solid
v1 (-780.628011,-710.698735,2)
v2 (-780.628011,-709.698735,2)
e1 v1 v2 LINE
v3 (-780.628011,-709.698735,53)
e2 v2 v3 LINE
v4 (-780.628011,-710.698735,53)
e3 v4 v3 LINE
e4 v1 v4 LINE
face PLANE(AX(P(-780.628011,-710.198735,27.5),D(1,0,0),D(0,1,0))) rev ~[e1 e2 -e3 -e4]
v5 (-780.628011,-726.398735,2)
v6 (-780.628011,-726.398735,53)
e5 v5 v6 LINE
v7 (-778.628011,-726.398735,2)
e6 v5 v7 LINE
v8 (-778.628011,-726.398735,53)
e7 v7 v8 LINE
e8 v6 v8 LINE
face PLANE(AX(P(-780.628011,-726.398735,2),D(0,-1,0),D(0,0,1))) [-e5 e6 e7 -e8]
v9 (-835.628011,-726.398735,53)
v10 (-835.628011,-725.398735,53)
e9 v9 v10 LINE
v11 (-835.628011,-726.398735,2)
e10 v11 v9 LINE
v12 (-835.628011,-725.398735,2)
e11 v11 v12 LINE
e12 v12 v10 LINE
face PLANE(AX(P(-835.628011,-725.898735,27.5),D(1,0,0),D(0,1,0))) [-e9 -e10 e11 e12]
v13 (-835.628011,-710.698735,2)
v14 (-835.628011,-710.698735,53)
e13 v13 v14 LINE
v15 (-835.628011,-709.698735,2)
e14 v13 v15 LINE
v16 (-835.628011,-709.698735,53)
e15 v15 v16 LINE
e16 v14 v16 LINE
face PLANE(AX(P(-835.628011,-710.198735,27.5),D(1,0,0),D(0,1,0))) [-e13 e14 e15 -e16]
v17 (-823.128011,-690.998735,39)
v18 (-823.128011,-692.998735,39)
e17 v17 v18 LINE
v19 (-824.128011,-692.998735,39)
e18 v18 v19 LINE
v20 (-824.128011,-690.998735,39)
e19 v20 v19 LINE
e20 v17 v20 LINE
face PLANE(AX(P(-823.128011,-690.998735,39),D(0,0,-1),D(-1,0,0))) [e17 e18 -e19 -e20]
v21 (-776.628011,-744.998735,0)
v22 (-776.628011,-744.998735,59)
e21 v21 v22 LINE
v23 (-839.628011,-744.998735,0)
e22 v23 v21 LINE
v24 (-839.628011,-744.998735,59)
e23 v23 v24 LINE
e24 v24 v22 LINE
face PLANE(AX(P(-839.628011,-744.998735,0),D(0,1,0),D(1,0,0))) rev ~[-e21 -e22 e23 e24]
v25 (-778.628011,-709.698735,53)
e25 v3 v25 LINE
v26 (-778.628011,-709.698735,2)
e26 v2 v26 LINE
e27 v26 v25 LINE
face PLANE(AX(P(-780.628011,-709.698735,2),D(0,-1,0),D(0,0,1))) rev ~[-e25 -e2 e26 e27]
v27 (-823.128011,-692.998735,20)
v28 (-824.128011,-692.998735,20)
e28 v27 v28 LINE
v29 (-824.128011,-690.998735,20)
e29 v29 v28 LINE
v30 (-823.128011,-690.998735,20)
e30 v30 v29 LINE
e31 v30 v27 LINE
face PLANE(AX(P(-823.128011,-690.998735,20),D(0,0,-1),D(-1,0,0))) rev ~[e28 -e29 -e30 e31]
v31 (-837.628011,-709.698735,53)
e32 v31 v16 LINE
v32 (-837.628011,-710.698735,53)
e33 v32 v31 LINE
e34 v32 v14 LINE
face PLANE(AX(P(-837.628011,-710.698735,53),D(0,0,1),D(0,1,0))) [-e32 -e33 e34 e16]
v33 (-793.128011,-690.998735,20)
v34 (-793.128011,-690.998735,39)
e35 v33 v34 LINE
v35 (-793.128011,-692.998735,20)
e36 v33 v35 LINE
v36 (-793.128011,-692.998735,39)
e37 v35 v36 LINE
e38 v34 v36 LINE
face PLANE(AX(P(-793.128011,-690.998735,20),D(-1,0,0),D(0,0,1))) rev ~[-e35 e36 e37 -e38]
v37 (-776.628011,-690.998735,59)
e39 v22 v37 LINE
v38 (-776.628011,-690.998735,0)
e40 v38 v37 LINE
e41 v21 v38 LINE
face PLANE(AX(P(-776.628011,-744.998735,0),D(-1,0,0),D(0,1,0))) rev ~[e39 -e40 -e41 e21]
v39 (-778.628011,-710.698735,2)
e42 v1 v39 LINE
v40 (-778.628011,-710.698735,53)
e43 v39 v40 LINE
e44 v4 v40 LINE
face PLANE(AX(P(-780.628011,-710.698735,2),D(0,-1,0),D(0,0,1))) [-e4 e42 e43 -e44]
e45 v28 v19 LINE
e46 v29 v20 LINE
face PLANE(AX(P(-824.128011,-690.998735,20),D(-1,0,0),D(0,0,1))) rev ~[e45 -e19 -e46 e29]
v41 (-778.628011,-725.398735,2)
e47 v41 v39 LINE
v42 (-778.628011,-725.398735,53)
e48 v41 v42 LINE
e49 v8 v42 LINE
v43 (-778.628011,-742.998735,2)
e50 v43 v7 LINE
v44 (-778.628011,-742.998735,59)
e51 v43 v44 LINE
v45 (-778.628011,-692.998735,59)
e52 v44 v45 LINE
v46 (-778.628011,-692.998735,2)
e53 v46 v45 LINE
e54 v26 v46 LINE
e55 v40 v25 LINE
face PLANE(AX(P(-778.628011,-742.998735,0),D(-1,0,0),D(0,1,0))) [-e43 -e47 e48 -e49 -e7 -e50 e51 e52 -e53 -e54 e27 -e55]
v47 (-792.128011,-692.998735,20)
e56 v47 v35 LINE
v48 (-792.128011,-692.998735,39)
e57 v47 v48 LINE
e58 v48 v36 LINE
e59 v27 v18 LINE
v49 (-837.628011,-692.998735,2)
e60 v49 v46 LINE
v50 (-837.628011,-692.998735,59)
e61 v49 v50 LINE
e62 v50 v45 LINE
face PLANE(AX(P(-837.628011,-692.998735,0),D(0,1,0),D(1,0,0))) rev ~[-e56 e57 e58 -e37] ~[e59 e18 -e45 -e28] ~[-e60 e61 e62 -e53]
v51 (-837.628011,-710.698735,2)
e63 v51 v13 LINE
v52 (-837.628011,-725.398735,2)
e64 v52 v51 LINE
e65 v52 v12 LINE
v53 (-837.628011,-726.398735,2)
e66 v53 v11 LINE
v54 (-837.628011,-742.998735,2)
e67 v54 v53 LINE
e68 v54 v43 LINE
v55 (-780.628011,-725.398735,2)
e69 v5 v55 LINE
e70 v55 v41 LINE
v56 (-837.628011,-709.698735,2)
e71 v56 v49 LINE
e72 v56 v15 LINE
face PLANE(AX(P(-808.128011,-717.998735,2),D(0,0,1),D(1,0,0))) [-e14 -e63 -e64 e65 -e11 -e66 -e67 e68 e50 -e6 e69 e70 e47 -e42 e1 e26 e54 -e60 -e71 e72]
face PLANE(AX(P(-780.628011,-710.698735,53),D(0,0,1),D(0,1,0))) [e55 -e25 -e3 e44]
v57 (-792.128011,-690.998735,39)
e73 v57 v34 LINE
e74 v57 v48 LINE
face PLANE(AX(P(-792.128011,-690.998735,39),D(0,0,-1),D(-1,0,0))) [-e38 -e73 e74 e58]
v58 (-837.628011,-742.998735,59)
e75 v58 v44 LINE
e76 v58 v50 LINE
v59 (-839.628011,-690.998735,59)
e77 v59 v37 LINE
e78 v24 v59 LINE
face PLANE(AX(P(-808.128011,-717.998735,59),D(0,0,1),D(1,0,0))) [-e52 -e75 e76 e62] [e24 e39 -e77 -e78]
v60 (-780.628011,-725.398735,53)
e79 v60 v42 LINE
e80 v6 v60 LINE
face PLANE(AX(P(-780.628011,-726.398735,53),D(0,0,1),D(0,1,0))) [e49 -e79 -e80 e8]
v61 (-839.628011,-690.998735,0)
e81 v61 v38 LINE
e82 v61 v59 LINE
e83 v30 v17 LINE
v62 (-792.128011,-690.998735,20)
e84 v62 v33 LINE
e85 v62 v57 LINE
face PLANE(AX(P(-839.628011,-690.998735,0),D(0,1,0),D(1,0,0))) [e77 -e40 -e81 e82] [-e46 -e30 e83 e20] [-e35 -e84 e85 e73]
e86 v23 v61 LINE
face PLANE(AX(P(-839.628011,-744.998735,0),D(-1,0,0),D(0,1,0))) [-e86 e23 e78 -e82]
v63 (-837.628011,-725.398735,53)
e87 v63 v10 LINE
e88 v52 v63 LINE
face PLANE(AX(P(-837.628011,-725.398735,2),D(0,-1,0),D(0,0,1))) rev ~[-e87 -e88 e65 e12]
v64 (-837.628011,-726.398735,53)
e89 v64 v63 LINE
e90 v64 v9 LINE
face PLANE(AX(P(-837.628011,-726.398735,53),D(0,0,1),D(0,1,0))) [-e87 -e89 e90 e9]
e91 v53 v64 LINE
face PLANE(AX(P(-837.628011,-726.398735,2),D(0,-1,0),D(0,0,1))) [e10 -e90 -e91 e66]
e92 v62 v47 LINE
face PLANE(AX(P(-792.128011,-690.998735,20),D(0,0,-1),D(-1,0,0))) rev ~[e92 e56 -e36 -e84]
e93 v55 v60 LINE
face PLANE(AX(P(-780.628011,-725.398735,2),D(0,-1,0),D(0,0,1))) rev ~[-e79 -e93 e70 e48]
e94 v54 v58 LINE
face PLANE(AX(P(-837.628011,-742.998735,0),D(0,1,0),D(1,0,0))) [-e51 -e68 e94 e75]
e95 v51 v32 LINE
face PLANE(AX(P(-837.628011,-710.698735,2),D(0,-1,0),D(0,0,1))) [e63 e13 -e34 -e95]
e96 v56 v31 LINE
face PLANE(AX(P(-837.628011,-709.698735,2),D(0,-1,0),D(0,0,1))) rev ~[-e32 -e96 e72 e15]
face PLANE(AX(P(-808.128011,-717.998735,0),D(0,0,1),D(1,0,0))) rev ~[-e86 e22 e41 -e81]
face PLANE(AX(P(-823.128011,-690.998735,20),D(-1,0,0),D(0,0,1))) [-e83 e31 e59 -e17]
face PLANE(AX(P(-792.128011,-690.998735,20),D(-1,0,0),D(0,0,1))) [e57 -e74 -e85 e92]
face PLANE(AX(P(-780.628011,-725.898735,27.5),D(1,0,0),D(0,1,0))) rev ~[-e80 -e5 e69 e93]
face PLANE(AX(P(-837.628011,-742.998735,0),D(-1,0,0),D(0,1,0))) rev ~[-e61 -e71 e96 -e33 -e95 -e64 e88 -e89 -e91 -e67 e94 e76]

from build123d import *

# Parameters (mm, degrees)
F0_W     = 63
F0_H     = 54
F0_W_2   = 59
F0_H_2   = 50
F1_DEPTH = 59
F2_DEPTH = 2
F3_W     = 1
F3_H     = 51
F4_DEPTH = 2
F5_START = 57
F5_DEPTH = 2
F6_W     = 1
F6_H     = 19
F7_DEPTH = 3


with BuildPart() as f1:
    # F0 (on Top) → F1 (new body)
    with BuildSketch(Plane.XY):
        with Locations((-808.1280109427, -717.9987351179)):
            Rectangle(F0_W, F0_H)
        with Locations((-808.1280109427, -717.9987351179)):
            Rectangle(F0_W_2, F0_H_2, mode=Mode.SUBTRACT)
    extrude(amount=F1_DEPTH)

    # F0 (on Top) → F2 (join)
    with BuildSketch(Plane.XY):
        with Locations((-808.1280109427, -717.9987351179)):
            Rectangle(F0_W_2, F0_H_2)
    extrude(amount=F2_DEPTH)

    # F3 (on face) → F4 (join)
    with BuildSketch(Plane.YZ.offset(-837.6280109427)):
        with Locations((-710.1987351179, 27.5)):
            Rectangle(F3_W, F3_H)
        with Locations((-725.8987351179, 27.5)):
            Rectangle(F3_W, F3_H)
    extrude(amount=F4_DEPTH)

    # F3 (on face) → F5 (join)
    with BuildSketch(Plane.YZ.offset(-837.6280109427).offset(F5_START)):
        with Locations((-710.1987351179, 27.5)):
            Rectangle(F3_W, F3_H)
        with Locations((-725.8987351179, 27.5)):
            Rectangle(F3_W, F3_H)
    extrude(amount=F5_DEPTH)

    # F6 (on face) → F7 (cut)
    with BuildSketch(Plane(origin=(0, -690.9987351179, 0), x_dir=(-1, 0, 0), z_dir=(0, 1, 0))):
        with Locations((823.6280109427, 29.5)):
            Rectangle(F6_W, F6_H)
        with Locations((792.6280109427, 29.5)):
            Rectangle(F6_W, F6_H)
    extrude(amount=-F7_DEPTH, mode=Mode.SUBTRACT)


solid = f1.part
